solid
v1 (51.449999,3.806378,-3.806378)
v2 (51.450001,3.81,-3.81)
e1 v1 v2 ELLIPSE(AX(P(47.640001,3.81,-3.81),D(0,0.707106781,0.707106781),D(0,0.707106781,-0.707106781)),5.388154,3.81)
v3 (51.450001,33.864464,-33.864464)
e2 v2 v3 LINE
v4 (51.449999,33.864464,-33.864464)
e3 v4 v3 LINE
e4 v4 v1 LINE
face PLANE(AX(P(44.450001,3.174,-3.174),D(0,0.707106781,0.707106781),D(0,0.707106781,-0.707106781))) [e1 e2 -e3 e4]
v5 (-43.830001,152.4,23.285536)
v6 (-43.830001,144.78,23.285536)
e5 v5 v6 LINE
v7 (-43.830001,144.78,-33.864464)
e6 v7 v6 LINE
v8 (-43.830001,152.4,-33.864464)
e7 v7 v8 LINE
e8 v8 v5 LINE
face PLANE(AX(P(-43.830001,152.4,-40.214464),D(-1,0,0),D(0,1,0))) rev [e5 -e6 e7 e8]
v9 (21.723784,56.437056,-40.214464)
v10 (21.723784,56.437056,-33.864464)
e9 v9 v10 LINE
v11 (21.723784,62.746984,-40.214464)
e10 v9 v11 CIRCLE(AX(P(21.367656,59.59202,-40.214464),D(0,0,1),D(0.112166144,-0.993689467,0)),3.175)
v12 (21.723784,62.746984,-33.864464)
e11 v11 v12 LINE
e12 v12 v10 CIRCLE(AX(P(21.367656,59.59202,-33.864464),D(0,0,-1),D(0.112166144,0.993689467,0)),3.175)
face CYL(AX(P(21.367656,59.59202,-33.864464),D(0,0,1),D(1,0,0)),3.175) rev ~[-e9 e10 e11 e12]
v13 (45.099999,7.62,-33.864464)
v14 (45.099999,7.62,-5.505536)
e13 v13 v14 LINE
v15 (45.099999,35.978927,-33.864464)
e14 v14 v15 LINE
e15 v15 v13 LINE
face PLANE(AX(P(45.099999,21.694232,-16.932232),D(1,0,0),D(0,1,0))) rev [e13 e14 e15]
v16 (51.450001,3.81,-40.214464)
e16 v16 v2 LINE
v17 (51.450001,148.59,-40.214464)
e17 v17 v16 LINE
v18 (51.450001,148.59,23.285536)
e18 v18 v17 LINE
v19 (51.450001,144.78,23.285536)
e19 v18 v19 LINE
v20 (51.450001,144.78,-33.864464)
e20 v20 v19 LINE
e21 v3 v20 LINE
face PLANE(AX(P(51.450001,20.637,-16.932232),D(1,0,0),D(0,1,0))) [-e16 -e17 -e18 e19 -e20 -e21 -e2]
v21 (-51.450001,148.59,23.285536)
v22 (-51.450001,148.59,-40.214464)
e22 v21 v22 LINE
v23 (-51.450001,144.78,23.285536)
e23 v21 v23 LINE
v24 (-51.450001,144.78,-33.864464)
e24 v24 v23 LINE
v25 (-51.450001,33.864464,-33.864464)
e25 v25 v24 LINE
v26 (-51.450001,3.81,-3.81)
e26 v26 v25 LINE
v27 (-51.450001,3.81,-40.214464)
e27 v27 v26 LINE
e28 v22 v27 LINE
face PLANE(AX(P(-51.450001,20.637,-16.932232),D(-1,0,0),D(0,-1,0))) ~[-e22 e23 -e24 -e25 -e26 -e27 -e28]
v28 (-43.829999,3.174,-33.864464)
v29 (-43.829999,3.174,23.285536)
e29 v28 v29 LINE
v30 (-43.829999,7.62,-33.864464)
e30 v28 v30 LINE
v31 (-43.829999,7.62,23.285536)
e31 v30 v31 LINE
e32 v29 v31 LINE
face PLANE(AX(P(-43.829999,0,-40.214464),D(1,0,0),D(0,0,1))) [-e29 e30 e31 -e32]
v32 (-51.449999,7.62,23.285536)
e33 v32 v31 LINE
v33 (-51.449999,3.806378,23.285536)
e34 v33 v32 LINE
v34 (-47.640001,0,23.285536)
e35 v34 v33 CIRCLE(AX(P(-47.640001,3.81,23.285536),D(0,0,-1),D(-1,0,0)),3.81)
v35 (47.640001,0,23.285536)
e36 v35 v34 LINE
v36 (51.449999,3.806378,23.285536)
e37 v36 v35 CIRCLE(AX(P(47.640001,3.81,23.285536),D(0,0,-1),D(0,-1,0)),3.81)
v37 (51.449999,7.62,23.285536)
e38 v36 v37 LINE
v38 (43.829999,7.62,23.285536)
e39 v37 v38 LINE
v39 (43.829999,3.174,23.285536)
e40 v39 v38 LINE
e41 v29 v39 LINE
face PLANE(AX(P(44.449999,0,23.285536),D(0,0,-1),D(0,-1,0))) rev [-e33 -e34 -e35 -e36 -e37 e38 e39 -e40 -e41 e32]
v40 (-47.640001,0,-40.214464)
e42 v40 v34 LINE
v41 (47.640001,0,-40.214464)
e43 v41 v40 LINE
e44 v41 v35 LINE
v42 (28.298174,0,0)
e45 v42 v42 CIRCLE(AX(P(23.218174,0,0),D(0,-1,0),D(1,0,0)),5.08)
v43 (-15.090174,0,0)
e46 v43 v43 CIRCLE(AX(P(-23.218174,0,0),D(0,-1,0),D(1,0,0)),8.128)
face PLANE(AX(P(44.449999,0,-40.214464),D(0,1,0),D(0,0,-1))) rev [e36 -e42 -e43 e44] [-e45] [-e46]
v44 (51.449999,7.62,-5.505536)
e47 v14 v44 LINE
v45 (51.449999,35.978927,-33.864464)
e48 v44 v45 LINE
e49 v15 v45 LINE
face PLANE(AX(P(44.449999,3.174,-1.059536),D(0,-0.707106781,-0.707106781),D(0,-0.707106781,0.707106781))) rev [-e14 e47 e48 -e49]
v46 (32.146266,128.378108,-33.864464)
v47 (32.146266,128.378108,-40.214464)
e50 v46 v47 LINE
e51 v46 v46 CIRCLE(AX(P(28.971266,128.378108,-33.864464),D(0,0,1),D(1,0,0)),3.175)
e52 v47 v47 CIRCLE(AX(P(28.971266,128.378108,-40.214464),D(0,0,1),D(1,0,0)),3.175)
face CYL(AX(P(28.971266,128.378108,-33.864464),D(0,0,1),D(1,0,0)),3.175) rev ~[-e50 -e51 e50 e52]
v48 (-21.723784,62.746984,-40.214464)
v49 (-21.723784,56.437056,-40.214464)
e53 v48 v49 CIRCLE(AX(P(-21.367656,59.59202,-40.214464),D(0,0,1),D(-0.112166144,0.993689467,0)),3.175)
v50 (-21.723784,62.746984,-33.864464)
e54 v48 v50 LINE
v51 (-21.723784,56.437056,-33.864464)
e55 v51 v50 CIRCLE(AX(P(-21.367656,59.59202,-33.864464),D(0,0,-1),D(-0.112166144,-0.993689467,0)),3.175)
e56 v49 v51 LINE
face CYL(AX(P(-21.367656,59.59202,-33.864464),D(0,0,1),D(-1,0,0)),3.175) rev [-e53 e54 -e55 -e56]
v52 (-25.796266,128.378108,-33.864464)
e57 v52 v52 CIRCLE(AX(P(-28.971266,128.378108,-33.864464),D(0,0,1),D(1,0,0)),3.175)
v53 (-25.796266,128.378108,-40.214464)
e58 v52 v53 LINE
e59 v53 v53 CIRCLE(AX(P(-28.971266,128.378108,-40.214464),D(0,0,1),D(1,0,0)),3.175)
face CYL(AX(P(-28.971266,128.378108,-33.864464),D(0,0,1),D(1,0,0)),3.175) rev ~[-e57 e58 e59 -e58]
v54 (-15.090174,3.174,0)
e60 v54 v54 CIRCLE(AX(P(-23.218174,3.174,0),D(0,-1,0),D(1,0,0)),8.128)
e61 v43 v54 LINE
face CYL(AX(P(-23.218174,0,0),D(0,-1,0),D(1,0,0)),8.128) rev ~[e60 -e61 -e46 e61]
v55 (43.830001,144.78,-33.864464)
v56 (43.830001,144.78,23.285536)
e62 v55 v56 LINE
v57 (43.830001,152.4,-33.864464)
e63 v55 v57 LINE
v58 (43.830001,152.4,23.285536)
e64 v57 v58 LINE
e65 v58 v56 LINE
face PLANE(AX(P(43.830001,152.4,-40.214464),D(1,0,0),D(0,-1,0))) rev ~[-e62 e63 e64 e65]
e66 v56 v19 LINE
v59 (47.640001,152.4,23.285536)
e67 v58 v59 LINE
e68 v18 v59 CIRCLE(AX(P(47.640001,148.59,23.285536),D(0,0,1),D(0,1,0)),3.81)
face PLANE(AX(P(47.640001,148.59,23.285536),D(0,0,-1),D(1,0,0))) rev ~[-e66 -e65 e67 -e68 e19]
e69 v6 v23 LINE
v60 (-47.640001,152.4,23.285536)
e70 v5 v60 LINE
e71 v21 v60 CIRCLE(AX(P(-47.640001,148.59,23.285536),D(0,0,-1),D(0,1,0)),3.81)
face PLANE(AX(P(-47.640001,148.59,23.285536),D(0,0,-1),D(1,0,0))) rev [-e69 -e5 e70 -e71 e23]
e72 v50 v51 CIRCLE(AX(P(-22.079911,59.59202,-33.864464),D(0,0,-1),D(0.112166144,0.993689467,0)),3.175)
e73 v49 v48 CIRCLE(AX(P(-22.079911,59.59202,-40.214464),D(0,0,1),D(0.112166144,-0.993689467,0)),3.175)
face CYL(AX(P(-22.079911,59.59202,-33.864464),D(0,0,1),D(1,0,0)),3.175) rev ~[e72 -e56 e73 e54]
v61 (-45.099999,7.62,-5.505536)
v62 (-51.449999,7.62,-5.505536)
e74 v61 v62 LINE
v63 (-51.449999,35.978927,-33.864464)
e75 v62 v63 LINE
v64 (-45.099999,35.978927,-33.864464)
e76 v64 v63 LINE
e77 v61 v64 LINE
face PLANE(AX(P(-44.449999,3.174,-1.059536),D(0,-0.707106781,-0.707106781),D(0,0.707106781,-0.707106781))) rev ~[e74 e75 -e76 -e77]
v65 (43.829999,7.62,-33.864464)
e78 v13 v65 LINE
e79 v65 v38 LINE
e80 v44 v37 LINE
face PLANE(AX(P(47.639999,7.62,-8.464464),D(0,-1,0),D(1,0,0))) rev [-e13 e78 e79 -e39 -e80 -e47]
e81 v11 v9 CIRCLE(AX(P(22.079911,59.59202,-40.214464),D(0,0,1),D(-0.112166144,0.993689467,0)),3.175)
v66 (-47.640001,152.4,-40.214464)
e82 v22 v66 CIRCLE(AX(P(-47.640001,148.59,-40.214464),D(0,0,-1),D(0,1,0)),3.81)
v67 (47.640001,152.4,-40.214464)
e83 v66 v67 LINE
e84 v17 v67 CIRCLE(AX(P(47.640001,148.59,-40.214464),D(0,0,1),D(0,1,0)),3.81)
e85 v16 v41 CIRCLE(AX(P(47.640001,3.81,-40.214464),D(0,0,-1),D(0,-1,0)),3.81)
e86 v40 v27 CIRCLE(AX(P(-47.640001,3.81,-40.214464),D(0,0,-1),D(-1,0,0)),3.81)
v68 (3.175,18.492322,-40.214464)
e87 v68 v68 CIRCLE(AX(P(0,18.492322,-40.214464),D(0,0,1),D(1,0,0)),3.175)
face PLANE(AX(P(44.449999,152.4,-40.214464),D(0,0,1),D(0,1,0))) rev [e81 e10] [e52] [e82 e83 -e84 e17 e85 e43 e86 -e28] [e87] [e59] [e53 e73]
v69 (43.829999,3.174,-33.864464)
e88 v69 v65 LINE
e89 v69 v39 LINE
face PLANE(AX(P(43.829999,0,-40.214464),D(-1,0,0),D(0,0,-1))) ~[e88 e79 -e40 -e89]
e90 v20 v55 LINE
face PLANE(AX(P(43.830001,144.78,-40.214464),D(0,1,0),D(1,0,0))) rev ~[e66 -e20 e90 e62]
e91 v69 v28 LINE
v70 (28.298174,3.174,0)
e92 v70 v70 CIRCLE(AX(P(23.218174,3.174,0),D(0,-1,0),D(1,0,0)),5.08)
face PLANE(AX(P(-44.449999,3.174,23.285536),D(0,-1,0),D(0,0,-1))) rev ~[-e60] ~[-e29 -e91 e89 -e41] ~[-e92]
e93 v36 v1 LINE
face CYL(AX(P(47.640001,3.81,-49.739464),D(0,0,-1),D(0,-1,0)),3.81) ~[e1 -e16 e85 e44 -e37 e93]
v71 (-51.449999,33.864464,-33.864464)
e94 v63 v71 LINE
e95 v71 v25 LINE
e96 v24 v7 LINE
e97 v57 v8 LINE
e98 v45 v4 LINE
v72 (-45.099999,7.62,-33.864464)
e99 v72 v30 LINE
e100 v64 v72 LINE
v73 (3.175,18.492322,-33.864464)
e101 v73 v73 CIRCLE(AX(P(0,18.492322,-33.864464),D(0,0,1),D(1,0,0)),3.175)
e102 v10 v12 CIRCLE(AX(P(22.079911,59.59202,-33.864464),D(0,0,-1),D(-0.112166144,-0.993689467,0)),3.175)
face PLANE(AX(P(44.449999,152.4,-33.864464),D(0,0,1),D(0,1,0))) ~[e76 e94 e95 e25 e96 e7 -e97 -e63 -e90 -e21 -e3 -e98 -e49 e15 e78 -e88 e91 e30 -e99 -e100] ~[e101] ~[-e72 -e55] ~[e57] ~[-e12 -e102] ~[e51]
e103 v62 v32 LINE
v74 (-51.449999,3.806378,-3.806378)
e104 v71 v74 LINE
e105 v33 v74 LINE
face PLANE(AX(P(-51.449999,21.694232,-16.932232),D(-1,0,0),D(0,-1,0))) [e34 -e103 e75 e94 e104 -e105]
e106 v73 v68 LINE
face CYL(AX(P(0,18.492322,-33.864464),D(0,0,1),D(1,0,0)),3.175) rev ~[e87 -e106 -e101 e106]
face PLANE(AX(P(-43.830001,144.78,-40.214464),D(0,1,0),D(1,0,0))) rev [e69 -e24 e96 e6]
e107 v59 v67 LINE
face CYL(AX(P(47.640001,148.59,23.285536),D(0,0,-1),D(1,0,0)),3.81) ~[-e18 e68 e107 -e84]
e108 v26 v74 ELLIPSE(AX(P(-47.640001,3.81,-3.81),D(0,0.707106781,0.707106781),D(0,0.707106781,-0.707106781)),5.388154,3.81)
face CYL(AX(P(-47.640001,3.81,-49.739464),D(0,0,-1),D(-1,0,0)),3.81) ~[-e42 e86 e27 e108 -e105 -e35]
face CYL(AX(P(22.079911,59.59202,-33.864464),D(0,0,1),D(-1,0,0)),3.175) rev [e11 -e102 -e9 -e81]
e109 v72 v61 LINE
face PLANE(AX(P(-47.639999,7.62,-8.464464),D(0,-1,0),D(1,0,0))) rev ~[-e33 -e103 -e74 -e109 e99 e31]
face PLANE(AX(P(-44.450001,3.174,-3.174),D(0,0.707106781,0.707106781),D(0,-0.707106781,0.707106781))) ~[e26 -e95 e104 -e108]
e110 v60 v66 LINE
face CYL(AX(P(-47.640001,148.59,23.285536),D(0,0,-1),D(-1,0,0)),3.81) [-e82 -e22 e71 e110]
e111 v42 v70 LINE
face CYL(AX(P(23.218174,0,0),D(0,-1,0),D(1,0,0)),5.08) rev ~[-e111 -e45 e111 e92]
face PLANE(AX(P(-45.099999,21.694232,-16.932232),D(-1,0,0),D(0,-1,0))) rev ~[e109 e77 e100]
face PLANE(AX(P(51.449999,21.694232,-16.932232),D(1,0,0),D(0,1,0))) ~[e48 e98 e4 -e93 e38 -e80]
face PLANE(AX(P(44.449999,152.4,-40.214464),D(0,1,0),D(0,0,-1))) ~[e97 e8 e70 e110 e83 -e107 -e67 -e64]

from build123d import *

# Parameters (mm, degrees)
F0_W         = 88.9
F0_H         = 63.5
F1_DEPTH     = 3.174
F2_W         = 88.9
F2_H         = 149.226
F3_DEPTH     = 6.35
F4_W         = 34.926
F4_H         = 33.8644637015
F5_DEPTH     = 6.35
F6_W         = 37.0404637015
F6_H         = 33.8644637015
F7_DEPTH     = 6.35
F8_T4_DEPTH  = 6.35
F9_T4_DEPTH  = 6.35
F10_R        = 8
F11_DEPTH    = 152.401
F10_R_2      = 5
F12_DEPTH    = 25.4
F13_R        = 3.175
F14_DEPTH    = 25.4
F15_DEPTH    = 7
F16_DEPTH    = 7
F17_DEPTH    = 7
F18_DEPTH    = 7
F19_W        = 7.62
F19_H        = 7.62
F20_DEPTH    = 63.5
F21_W        = 7.62
F21_H        = 63.5
F22_DEPTH    = 7.62
F24_T1_DEPTH = 82.55
F25_T1_DEPTH = 82.55
F26_R        = 3.81
F28_R        = 3.175
F29_DEPTH    = 25.4
F30_R        = 8.128
F31_DEPTH    = 25.4
F32_R        = 5.08
F33_DEPTH    = 25.4


# Not quite as in the source:
# - a fillet or chamfer that OpenCascade refuses, or shapes differently, is made with other operations: its cross-section is extruded or revolved along the edge and cut away or added
# - two fillets or chamfers of one size are made in one step


with BuildPart() as f1:
    # F0 (on Front) → F1 (new body)
    with BuildSketch(Plane.XZ):
        with Locations((8.606e-07, -8.4644637015)):
            Rectangle(F0_W, F0_H)
    extrude(amount=-F1_DEPTH)

    # F2 (on face) → F3 (join)
    with BuildSketch(Plane(origin=(0, 0, -40.2144637015), x_dir=(1, 0, 0), z_dir=(0, 0, -1))):
        with Locations((8.606e-07, -77.787)):
            Rectangle(F2_W, F2_H)
    extrude(amount=-F3_DEPTH)

    # F4 (on face) → F5 (join)
    with BuildSketch(Plane.YZ.offset(44.4500008606)):
        with Locations((20.637, -16.9322318508)):
            Rectangle(F4_W, F4_H)
    extrude(amount=-F5_DEPTH)

    # F6 (on face) → F7 (join)
    with BuildSketch(Plane(origin=(-44.4499991394, 0, 0), x_dir=(0, -1, 0), z_dir=(-1, 0, 0))):
        with Locations((-21.6942318508, -16.9322318508)):
            Rectangle(F6_W, F6_H)
    extrude(amount=-F7_DEPTH)

    # F8: chamfer of 38.1 on 1 edges, made by hand


with BuildPart() as f8_tool2:
    # F8_s3 → F8_t4 (new body)
    with BuildSketch(Plane.YZ.offset(-44.4499991394)):
        with BuildLine():
            Line((1.036832967, 1.0776307345), (41.292094436, -39.1776307345))
            Line((41.292094436, -39.1776307345), (42.054094436, -39.1776307345))
            ThreePointArc((42.054094436, -39.1776307345), (40.9764637015, -19.5888153673), (40.9764637015, 0))
            Line((40.9764637015, 0), (40.2144637015, 0.762))
            ThreePointArc((40.2144637015, 0.762), (20.6256483342, 0.762), (1.036832967, 1.8396307345))
            Line((1.036832967, 1.8396307345), (1.036832967, 1.0776307345))
        make_face()
    extrude(amount=F8_T4_DEPTH)

    split(bisect_by=Plane.XZ.offset(-3.174), keep=Keep.BOTTOM)

    split(bisect_by=Plane.XY.offset(-33.8644637015), keep=Keep.TOP)


with BuildPart() as f1_1:
    add(f1.part)

    # F8_t1: cut F8_tool2
    add(f8_tool2.part, mode=Mode.SUBTRACT)

    # F9: chamfer of 38.1 on 1 edges, made by hand


with BuildPart() as f9_tool2:
    # F9_s3 → F9_t4 (new body)
    with BuildSketch(Plane.YZ.offset(44.4500008606)):
        with BuildLine():
            Line((-1.0776307345, 1.0776307345), (39.1776307345, -39.1776307345))
            Line((39.1776307345, -39.1776307345), (39.9396307345, -39.1776307345))
            ThreePointArc((39.9396307345, -39.1776307345), (38.862, -19.5888153673), (38.862, 0))
            Line((38.862, 0), (38.1, 0.762))
            ThreePointArc((38.1, 0.762), (18.5111846327, 0.762), (-1.0776307345, 1.8396307345))
            Line((-1.0776307345, 1.8396307345), (-1.0776307345, 1.0776307345))
        make_face()
    extrude(amount=-F9_T4_DEPTH)

    split(bisect_by=Plane.XZ.offset(-3.174), keep=Keep.BOTTOM)

    split(bisect_by=Plane.XY.offset(-33.8644637015), keep=Keep.TOP)


with BuildPart() as f1_2:
    add(f1_1.part)

    # F9_t1: cut F9_tool2
    add(f9_tool2.part, mode=Mode.SUBTRACT)

    # F10 (on face) → F11 (cut, through all)
    with BuildSketch(Plane.XZ):
        with Locations((-23.4761538258, 0)):
            Circle(F10_R)
    extrude(amount=-F11_DEPTH, mode=Mode.SUBTRACT)

    # F10 (on face) → F12 (cut)
    with BuildSketch(Plane.XZ):
        with Locations((-23.4761538258, 0)):
            Circle(F10_R)
        with Locations((23.2181741801, 0)):
            Circle(F10_R_2)
    extrude(amount=-F12_DEPTH, mode=Mode.SUBTRACT)

    # F13 (on face) → F14 (cut)
    with BuildSketch(Plane.XY.offset(-33.8644637015)):
        with Locations((0, 18.4923222025)):
            Circle(F13_R)
        with Locations((-22.079911083, 59.5920197666)):
            Circle(F13_R)
        with Locations((21.367656067, 59.5920197666)):
            Circle(F13_R)
    extrude(amount=-F14_DEPTH, mode=Mode.SUBTRACT)

    # F15 (add): a face of the model
    f15_faces = [f1_2.faces().sort_by_distance(p)[0] for p in [
        (44.4500008606, 76.2, -38.5634637015),
    ]]
    extrude(f15_faces, amount=F15_DEPTH)

    # F16 (add): a face of the model
    f16_faces = [f1_2.faces().sort_by_distance(p)[0] for p in [
        (-44.4499991394, 1.651, -8.4644637015),
    ]]
    extrude(f16_faces, amount=F16_DEPTH)

    # F17 (cut): a face of the model
    f17_faces = [f1_2.faces().sort_by_distance(p)[0] for p in [
        (38.1000008606, 13.4041545672, -23.6343091343),
    ]]
    extrude(f17_faces, amount=-F17_DEPTH, mode=Mode.SUBTRACT)

    # F18 (cut): a face of the model
    f18_faces = [f1_2.faces().sort_by_distance(p)[0] for p in [
        (-38.0999991394, 14.108975801, -22.9294879005),
    ]]
    extrude(f18_faces, amount=-F18_DEPTH, mode=Mode.SUBTRACT)

    # F19 (on face) → F20 (join)
    with BuildSketch(Plane(origin=(0, 0, -40.2144637015), x_dir=(1, 0, 0), z_dir=(0, 0, -1))):
        with Locations((47.6400008606, -148.59)):
            Rectangle(F19_W, F19_H)
    extrude(amount=-F20_DEPTH)

    # F21 (on face) → F22 (join)
    with BuildSketch(Plane.XZ):
        with Locations((-47.6399991394, -8.4644637015)):
            Rectangle(F21_W, F21_H)
    extrude(amount=-F22_DEPTH)

    # F23: F1 across plane


with BuildPart() as f1_3:
    add(f1_2.part)
    add(f1_2.part.mirror(Plane.YZ))

    # F24: fillet of radius 3.81 on 1 edges, made by hand

    # F24_s2 → F24_t1 (cut)
    with BuildSketch(Plane.XY.offset(-49.7394637015)):
        with BuildLine():
            ThreePointArc((47.6400008606, 0), (50.3340776969, 1.1159231637), (51.4500008606, 3.81))
            Line((51.4500008606, 3.81), (51.4500008606, 0))
            Line((51.4500008606, 0), (47.6400008606, 0))
        make_face()
    extrude(amount=F24_T1_DEPTH, mode=Mode.SUBTRACT)

    # F25: fillet of radius 3.81 on 1 edges, made by hand

    # F25_s2 → F25_t1 (cut)
    with BuildSketch(Plane.XY.offset(-49.7394637015)):
        with BuildLine():
            ThreePointArc((-51.4500008606, 3.81), (-50.3340776969, 1.1159231637), (-47.6400008606, 0))
            Line((-47.6400008606, 0), (-51.4500008606, 0))
            Line((-51.4500008606, 0), (-51.4500008606, 3.81))
        make_face()
    extrude(amount=F25_T1_DEPTH, mode=Mode.SUBTRACT)

    # F26
    f26_edges = [f1_3.edges().sort_by_distance(p)[0] for p in [
        (51.450001, 152.4, -8.464464),
        (-51.450001, 152.4, -8.464464),
    ]]
    fillet(f26_edges, radius=F26_R)

    # F28 (on face) → F29 (cut)
    with BuildSketch(Plane.XY.offset(-33.8644637015)):
        with Locations((28.9712660015, 128.3781081438)):
            Circle(F28_R)
        with Locations((-28.9712660015, 128.3781081438)):
            Circle(F28_R)
    extrude(amount=-F29_DEPTH, mode=Mode.SUBTRACT)

    # F30 (on face) → F31 (cut)
    with BuildSketch(Plane.XZ):
        with Locations((-23.2181741801, 0)):
            Circle(F30_R)
    extrude(amount=-F31_DEPTH, mode=Mode.SUBTRACT)

    # F32 (on face) → F33 (cut)
    with BuildSketch(Plane.XZ):
        with Locations((23.2181741801, 0)):
            Circle(F32_R)
    extrude(amount=-F33_DEPTH, mode=Mode.SUBTRACT)


solid = f1_3.part
